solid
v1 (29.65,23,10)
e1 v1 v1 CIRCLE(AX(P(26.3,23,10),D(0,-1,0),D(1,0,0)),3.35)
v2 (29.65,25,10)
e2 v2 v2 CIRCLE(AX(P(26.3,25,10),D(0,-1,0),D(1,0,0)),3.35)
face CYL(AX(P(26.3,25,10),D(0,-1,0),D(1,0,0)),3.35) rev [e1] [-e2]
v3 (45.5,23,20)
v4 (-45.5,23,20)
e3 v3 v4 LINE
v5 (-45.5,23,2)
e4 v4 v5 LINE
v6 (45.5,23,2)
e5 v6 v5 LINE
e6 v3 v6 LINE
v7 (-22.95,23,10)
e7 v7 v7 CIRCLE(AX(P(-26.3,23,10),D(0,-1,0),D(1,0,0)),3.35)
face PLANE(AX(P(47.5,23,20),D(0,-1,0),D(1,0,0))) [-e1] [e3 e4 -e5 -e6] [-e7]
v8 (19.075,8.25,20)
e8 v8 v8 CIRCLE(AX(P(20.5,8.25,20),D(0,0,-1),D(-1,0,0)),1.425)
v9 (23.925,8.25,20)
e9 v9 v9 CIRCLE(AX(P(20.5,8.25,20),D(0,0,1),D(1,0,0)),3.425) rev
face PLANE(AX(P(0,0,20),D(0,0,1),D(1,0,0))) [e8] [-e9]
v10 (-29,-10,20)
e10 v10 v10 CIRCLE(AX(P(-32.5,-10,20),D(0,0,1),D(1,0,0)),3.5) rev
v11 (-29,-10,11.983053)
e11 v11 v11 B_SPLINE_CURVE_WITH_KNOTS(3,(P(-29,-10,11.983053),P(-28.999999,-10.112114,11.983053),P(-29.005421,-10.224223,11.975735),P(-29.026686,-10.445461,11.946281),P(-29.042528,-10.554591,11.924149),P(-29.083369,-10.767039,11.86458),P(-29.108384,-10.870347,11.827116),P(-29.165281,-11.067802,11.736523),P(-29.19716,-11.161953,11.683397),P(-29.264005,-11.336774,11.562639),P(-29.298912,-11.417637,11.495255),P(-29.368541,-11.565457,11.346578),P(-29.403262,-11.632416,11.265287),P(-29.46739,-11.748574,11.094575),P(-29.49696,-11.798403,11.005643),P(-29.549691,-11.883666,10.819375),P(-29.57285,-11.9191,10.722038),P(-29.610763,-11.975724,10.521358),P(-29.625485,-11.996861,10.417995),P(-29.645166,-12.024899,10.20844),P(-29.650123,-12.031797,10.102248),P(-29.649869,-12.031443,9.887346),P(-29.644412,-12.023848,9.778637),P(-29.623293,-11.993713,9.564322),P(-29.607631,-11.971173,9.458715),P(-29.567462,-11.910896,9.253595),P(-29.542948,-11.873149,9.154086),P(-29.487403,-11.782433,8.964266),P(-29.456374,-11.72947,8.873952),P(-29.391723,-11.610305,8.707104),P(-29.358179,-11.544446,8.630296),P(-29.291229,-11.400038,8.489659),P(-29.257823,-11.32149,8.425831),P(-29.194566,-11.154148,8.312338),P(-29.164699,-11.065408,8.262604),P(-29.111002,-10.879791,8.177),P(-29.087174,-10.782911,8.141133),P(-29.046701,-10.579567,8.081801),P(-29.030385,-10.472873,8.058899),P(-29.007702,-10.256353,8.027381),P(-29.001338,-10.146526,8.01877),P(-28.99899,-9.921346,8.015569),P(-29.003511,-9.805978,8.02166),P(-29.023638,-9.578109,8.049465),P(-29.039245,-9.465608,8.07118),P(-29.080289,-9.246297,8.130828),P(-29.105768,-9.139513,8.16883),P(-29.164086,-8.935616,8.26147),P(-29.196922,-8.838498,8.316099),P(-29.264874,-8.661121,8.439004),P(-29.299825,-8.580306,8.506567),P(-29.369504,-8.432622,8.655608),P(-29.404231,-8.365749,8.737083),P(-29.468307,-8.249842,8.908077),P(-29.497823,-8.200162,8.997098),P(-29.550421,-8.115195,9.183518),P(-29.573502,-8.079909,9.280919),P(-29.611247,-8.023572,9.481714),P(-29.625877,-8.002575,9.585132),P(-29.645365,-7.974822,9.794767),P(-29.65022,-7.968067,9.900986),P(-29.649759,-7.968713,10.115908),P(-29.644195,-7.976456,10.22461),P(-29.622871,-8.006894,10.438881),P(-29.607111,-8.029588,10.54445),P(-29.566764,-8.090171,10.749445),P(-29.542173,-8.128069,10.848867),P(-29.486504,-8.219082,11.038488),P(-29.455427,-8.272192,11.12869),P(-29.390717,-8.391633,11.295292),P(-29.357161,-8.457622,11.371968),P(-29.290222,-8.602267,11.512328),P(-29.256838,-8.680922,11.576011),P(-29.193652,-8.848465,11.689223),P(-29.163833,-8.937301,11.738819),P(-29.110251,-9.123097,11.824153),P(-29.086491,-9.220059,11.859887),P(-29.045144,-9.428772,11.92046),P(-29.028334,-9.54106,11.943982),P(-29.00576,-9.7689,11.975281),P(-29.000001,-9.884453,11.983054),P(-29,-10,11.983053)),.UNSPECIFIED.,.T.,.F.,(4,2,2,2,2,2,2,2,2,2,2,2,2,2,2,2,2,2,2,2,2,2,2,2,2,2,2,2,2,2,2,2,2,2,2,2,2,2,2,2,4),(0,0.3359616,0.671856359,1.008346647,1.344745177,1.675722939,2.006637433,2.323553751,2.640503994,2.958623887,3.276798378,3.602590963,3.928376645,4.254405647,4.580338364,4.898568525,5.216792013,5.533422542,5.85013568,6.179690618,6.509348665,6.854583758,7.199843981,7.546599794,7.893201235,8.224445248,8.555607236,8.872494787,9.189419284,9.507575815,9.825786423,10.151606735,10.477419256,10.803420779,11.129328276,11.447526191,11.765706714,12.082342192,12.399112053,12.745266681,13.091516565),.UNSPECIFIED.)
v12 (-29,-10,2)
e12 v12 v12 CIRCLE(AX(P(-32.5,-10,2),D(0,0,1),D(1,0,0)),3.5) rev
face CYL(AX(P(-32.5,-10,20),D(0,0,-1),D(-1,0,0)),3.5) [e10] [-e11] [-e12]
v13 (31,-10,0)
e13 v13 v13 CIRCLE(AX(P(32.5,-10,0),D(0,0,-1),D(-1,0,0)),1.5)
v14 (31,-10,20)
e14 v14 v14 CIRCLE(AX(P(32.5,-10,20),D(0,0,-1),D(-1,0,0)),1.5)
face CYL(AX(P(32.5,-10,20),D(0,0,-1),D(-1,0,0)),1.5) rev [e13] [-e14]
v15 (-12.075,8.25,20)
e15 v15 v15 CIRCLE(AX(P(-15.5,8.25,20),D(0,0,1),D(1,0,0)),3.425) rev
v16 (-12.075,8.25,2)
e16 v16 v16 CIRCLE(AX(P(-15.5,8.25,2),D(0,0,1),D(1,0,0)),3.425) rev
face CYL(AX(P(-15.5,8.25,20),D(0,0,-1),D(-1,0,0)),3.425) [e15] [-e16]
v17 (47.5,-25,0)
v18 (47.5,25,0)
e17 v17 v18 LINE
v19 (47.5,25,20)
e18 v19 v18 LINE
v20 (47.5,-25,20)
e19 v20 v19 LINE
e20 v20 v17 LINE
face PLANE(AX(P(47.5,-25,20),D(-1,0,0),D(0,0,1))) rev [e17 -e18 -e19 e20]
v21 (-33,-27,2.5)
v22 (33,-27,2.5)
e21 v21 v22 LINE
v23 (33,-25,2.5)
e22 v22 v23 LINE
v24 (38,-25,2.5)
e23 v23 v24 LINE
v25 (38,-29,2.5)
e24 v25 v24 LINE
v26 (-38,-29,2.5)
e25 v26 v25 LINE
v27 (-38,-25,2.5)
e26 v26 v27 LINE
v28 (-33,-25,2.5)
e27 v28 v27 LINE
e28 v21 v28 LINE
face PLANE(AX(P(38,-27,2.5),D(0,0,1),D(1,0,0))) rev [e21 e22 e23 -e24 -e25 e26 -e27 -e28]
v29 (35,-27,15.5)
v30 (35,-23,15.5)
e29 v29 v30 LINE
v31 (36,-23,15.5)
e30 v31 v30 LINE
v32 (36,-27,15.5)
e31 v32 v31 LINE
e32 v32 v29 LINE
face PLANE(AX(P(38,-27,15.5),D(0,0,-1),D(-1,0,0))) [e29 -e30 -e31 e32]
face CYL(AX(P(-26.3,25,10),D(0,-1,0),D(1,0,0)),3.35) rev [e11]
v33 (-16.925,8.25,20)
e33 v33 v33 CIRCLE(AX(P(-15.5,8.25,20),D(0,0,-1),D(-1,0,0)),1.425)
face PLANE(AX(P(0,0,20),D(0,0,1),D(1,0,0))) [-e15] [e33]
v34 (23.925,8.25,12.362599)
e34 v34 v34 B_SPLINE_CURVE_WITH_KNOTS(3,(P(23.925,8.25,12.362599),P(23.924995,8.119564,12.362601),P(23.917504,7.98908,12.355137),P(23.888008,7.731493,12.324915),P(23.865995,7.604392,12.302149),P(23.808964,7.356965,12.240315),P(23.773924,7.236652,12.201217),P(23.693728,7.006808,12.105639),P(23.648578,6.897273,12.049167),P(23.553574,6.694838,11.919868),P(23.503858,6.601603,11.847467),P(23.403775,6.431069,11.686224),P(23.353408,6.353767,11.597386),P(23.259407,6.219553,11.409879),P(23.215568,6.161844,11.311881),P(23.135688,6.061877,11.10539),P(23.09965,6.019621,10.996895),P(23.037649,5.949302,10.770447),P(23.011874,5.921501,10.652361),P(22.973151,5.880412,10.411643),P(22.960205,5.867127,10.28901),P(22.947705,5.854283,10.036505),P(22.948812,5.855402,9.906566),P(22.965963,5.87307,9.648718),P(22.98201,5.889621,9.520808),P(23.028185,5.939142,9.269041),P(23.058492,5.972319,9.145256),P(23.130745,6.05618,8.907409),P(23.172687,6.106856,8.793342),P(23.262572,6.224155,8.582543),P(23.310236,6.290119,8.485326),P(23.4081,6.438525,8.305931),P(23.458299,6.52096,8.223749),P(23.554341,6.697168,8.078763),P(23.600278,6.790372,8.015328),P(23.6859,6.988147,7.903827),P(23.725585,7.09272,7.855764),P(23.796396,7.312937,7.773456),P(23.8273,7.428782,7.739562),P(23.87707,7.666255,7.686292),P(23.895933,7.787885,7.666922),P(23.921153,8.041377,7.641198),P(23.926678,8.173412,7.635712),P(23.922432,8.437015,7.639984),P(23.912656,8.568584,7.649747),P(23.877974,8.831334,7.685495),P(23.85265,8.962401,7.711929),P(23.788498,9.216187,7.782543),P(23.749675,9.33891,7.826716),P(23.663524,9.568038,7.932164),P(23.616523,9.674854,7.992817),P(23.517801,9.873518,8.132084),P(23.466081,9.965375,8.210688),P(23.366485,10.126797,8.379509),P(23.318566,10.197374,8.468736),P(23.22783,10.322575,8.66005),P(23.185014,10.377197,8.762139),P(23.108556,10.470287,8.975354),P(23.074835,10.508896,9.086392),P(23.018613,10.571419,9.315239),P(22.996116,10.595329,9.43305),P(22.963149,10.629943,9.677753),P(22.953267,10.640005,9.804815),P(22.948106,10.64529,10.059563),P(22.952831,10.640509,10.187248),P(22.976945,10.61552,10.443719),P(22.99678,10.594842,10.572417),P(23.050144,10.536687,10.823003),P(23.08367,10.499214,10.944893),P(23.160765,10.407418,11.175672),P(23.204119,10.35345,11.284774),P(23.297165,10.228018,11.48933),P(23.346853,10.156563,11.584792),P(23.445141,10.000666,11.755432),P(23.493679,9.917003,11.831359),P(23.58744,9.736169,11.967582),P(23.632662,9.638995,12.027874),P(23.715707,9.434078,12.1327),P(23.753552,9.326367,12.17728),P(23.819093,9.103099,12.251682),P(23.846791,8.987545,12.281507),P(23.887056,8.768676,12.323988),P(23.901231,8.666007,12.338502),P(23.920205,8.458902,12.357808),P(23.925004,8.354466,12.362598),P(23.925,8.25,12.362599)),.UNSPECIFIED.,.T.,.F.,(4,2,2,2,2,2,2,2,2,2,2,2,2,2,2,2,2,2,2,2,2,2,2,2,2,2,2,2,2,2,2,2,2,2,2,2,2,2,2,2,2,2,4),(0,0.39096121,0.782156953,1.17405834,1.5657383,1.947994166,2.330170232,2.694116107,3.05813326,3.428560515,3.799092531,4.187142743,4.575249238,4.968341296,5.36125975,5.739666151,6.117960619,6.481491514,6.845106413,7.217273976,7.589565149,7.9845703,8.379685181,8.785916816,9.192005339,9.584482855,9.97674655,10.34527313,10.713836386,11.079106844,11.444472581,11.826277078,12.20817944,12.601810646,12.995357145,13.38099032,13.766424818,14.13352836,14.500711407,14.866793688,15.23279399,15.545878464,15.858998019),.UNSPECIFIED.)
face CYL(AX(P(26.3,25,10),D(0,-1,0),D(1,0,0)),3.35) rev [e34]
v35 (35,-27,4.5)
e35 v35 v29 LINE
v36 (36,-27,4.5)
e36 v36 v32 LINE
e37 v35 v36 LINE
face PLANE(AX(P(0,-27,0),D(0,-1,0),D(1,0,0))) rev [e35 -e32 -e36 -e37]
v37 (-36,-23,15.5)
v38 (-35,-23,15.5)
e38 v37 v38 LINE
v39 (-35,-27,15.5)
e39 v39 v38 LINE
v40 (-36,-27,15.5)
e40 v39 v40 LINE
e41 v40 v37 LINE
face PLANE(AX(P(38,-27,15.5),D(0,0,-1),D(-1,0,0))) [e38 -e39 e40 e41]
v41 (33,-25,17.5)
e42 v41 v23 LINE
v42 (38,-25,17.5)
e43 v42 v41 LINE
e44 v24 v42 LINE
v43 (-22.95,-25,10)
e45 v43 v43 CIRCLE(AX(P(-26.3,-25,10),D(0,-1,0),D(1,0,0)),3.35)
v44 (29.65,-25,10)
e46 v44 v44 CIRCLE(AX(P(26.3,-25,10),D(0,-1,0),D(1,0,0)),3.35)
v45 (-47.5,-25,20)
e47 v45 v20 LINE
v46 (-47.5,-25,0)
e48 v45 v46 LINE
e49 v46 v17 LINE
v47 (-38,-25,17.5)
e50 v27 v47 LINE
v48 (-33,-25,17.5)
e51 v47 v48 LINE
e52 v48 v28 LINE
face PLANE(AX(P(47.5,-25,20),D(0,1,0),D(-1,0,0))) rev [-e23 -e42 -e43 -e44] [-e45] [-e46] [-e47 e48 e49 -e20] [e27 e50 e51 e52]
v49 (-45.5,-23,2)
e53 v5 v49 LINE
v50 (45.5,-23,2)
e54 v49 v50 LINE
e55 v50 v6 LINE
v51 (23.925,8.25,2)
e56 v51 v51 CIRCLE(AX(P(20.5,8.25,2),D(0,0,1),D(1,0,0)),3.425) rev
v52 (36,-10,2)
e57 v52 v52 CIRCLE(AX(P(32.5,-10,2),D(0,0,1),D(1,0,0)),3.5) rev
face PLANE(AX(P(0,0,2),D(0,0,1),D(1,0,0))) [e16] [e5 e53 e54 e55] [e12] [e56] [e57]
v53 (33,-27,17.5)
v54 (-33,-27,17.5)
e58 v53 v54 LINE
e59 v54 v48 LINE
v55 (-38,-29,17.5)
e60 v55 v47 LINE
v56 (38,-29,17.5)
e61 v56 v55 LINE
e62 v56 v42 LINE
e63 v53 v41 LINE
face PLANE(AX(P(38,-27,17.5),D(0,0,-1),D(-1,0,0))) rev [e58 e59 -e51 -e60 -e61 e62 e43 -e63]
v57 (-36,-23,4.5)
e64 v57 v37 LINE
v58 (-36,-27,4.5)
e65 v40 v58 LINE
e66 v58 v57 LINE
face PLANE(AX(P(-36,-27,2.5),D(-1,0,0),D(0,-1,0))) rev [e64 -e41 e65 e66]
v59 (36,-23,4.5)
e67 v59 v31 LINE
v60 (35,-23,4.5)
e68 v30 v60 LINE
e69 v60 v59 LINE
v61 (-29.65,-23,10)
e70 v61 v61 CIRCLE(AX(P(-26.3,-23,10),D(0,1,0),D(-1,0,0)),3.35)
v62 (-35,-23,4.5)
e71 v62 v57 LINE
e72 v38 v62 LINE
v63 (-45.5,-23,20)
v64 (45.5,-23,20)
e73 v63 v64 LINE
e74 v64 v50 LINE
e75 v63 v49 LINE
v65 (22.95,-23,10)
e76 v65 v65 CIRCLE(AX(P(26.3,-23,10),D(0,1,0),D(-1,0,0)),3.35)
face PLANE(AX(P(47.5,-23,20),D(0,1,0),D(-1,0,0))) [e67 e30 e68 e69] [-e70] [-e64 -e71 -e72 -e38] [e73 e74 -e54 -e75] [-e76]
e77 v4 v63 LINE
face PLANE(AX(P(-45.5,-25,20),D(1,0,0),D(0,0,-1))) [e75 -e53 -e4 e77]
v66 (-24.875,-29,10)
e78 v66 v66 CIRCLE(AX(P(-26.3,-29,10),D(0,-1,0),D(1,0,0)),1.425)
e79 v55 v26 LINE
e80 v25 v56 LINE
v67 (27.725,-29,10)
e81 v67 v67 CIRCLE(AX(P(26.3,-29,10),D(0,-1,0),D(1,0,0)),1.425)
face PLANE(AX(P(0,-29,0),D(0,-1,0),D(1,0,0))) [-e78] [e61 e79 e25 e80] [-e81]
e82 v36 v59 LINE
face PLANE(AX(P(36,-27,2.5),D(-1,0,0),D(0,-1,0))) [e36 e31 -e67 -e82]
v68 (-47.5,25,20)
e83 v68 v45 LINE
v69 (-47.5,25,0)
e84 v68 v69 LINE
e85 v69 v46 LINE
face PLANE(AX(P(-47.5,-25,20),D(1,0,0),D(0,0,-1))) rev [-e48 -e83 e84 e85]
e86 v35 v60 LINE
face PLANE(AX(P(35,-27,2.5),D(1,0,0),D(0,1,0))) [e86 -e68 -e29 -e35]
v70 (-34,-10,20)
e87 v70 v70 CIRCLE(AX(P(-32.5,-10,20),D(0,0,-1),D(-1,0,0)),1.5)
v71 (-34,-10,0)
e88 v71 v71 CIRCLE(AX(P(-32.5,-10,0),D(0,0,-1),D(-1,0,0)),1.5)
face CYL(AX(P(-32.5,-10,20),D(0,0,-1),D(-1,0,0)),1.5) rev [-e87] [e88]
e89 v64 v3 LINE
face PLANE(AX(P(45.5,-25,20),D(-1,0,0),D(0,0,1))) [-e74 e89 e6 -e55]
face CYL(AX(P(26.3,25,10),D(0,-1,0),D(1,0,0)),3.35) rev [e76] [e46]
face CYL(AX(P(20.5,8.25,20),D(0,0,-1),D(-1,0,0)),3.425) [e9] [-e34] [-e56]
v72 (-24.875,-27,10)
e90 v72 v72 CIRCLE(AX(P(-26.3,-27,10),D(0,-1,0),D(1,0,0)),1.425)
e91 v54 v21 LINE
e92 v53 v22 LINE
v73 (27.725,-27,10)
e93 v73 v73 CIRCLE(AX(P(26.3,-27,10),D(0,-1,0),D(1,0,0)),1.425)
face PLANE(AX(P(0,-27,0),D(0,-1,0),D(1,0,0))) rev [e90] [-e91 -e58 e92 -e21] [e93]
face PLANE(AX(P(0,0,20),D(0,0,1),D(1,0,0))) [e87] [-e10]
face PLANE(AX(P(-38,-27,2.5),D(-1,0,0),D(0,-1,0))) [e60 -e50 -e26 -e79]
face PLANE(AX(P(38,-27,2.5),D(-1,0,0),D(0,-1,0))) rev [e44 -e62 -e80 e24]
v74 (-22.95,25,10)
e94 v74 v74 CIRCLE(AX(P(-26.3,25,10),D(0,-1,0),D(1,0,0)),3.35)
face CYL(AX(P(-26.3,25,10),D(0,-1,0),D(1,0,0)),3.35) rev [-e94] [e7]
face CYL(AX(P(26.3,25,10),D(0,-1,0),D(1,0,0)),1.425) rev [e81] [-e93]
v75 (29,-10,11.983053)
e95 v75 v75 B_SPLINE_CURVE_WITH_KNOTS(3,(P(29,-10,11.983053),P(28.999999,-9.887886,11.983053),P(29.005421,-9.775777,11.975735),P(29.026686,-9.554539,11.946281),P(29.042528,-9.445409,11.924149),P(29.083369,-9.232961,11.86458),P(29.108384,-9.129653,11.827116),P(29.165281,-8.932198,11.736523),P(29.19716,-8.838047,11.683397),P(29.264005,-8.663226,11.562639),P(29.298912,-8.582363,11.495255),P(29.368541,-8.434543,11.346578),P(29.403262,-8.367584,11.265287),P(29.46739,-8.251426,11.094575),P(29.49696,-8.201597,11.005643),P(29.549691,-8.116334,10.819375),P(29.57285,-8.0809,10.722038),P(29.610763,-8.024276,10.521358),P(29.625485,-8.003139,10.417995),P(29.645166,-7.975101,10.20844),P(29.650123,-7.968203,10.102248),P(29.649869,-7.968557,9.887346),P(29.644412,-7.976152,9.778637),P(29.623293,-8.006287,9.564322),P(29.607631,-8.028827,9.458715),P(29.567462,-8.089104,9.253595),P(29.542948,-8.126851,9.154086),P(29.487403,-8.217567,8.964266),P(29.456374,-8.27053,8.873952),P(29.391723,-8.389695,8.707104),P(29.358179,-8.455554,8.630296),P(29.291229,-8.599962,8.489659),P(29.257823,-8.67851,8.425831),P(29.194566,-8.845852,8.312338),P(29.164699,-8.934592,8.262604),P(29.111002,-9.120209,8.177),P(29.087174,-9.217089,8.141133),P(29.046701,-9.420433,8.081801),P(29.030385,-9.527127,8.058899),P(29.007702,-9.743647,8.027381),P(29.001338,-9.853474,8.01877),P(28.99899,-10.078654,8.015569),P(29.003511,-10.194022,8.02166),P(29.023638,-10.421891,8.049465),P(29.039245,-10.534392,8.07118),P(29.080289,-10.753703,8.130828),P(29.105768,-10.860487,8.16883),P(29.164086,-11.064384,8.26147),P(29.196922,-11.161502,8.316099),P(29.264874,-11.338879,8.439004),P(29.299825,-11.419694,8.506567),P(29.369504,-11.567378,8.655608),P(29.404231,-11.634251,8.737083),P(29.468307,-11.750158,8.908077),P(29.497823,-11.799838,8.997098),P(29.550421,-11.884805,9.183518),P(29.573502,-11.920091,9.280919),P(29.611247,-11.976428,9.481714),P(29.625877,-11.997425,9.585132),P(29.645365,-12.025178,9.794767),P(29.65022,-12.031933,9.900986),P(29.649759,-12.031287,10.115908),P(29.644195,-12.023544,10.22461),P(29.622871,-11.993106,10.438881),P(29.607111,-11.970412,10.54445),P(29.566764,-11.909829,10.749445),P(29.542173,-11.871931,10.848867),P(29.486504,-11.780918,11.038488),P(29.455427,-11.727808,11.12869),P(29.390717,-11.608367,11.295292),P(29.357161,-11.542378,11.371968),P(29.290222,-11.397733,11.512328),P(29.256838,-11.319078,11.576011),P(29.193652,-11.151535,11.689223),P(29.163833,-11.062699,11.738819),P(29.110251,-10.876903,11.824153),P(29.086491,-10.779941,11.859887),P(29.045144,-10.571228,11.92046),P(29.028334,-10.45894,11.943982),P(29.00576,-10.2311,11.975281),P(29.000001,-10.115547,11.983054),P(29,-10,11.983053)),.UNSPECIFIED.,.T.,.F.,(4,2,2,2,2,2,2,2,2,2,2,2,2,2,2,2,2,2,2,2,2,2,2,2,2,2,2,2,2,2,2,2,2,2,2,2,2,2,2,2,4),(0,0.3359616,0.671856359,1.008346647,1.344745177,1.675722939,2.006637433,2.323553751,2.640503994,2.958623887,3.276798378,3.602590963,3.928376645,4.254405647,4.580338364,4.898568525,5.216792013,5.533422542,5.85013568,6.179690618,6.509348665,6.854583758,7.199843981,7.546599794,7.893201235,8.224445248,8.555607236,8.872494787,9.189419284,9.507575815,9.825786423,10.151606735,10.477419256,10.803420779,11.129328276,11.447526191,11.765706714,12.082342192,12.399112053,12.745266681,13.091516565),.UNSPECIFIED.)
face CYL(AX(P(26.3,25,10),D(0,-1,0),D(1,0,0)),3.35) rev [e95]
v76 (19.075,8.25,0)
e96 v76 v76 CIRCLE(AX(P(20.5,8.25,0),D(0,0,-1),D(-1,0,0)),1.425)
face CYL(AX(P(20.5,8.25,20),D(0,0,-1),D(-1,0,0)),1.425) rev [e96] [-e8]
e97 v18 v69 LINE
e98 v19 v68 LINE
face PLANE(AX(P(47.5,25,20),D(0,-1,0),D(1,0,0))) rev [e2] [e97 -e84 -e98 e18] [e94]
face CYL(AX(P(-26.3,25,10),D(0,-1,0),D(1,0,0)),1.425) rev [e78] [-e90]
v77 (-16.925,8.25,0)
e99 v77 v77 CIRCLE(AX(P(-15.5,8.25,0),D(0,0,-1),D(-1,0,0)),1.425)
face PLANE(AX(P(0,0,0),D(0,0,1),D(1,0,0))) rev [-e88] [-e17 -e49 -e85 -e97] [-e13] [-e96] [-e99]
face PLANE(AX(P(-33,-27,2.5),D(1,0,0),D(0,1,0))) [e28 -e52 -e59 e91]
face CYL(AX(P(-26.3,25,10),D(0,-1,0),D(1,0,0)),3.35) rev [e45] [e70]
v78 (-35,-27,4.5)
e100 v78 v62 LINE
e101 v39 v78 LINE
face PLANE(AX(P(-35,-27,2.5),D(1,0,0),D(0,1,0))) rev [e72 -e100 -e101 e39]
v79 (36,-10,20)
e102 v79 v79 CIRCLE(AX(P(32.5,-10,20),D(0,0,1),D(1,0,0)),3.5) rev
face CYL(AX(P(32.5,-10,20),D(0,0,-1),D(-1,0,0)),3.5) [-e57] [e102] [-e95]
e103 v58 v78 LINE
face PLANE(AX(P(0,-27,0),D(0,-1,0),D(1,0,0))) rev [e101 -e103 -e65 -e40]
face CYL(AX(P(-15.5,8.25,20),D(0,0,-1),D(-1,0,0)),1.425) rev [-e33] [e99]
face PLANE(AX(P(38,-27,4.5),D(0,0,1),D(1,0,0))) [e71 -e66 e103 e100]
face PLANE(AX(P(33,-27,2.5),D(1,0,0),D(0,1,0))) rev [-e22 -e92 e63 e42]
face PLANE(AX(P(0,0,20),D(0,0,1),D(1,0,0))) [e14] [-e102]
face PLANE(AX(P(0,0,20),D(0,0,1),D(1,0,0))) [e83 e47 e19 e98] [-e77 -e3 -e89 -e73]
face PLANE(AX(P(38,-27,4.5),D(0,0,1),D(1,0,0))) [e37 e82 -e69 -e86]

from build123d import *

# Parameters (mm, degrees)
SKETCH1_W               = 95
SKETCH1_H               = 50
BOSS_EXTRUDE1_DEPTH     = 20
SKETCH4_R               = 1.425
CUT_EXTRUDE3_DEPTH      = 58.282196187
LPATTERN1_COUNT         = 2
LPATTERN1_PITCH         = 36
SKETCH5_R               = 1.5
CUT_EXTRUDE4_DEPTH      = 58.282196187
SKETCH6_W               = 5
SKETCH6_H               = 15
BOSS_EXTRUDE2_DEPTH     = 2
SKETCH7_W               = 76
SKETCH7_H               = 15
BOSS_EXTRUDE3_DEPTH     = 2
SHELL1_START            = 2
SHELL1_OUTLINE_W        = 91
SHELL1_OUTLINE_H        = 46
SHELL1_OUTLINE_R        = 3.5
SHELL1_OUTLINE_R_2      = 3.425
SHELL1_DEPTH            = 18
SHELL1_START_2          = 4.5
SHELL1_2_OUTLINE_W      = 1
SHELL1_2_OUTLINE_H      = 4
SHELL1_2_DEPTH          = 11
SKETCH2_R               = 3.35
CUT_EXTRUDE1_DEPTH      = 72.807033082
CUT_EXTRUDE5_DEPTH      = 75.647505009
CUT_EXTRUDE5_DEPTH_BACK = 75.647505009
SKETCH10_R              = 1.425


# Read off the part's stored shape, not the designer's step: Shell1
with BuildPart() as part:
    # Sketch1 → Boss-Extrude1 (new body)
    with BuildSketch(Plane.XY):
        Rectangle(SKETCH1_W, SKETCH1_H)
    extrude(amount=BOSS_EXTRUDE1_DEPTH)

    # Sketch4 → Cut-Extrude3 (cut, through all)
    with BuildSketch(Plane(origin=(0, 0, 0), x_dir=(-1, 0, 0), z_dir=(0, 0, -1))):
        with Locations((15.5, 8.25)):
            Circle(SKETCH4_R)
    cut_extrude3 = extrude(amount=-CUT_EXTRUDE3_DEPTH, mode=Mode.SUBTRACT)

    # LPattern1: Cut-Extrude3 ×2
    with Locations(*[(i * LPATTERN1_PITCH, 0, 0) for i in range(1, LPATTERN1_COUNT)]):
        add(cut_extrude3, mode=Mode.SUBTRACT)

    # Sketch5 → Cut-Extrude4 (cut, through all)
    with BuildSketch(Plane(origin=(0, 0, 0), x_dir=(-1, 0, 0), z_dir=(0, 0, -1))):
        with Locations((-32.5, -10)):
            Circle(SKETCH5_R)
        with Locations((32.5, -10)):
            Circle(SKETCH5_R)
    extrude(amount=-CUT_EXTRUDE4_DEPTH, mode=Mode.SUBTRACT)

    # Sketch6 → Boss-Extrude2 (add)
    with BuildSketch(Plane.XZ.offset(25)):
        with Locations((35.5, 10)):
            Rectangle(SKETCH6_W, SKETCH6_H)
    boss_extrude2 = extrude(amount=BOSS_EXTRUDE2_DEPTH)

    # Mirror1: Boss-Extrude2 across plane
    add(boss_extrude2.mirror(Plane(origin=(0, 0, 0), x_dir=(0, 0, 1), z_dir=(1, 0, 0))))

    # Sketch7 → Boss-Extrude3 (add)
    with BuildSketch(Plane.XZ.offset(27)):
        with Locations((0, 10)):
            Rectangle(SKETCH7_W, SKETCH7_H)
    extrude(amount=BOSS_EXTRUDE3_DEPTH)

    # Shell1 outline → Shell1 (cut)
    with BuildSketch(Plane.XY.offset(SHELL1_START)):
        Rectangle(SHELL1_OUTLINE_W, SHELL1_OUTLINE_H)
        with Locations((-32.5, -10)):
            Circle(SHELL1_OUTLINE_R, mode=Mode.SUBTRACT)
        with Locations((32.5, -10)):
            Circle(SHELL1_OUTLINE_R, mode=Mode.SUBTRACT)
        with Locations((-15.5, 8.25)):
            Circle(SHELL1_OUTLINE_R_2, mode=Mode.SUBTRACT)
        with Locations((20.5, 8.25)):
            Circle(SHELL1_OUTLINE_R_2, mode=Mode.SUBTRACT)
    extrude(amount=SHELL1_DEPTH, mode=Mode.SUBTRACT)

    # Shell1 2 outline → Shell1 2 (cut)
    with BuildSketch(Plane.XY.offset(SHELL1_START_2)):
        with Locations((-35.5, -25)):
            Rectangle(SHELL1_2_OUTLINE_W, SHELL1_2_OUTLINE_H)
        with Locations((35.5, -25)):
            Rectangle(SHELL1_2_OUTLINE_W, SHELL1_2_OUTLINE_H)
    extrude(amount=SHELL1_2_DEPTH, mode=Mode.SUBTRACT)

    # Sketch2 → Cut-Extrude1 (cut, through all)
    with BuildSketch(Plane.XZ.offset(25)):
        with Locations((-26.3, 10)):
            Circle(SKETCH2_R)
        with Locations((26.3, 10)):
            Circle(SKETCH2_R)
    extrude(amount=-CUT_EXTRUDE1_DEPTH, mode=Mode.SUBTRACT)

    # Sketch10 → Cut-Extrude5 (cut, two sides: drawn at the far end of the back side and taken through both)
    with BuildSketch(Plane.XZ.offset(29).offset(-CUT_EXTRUDE5_DEPTH_BACK)):
        with Locations((26.3, 10)):
            Circle(SKETCH10_R)
        with Locations((-26.3, 10)):
            Circle(SKETCH10_R)
    extrude(amount=CUT_EXTRUDE5_DEPTH + CUT_EXTRUDE5_DEPTH_BACK, mode=Mode.SUBTRACT)


solid = part.part
